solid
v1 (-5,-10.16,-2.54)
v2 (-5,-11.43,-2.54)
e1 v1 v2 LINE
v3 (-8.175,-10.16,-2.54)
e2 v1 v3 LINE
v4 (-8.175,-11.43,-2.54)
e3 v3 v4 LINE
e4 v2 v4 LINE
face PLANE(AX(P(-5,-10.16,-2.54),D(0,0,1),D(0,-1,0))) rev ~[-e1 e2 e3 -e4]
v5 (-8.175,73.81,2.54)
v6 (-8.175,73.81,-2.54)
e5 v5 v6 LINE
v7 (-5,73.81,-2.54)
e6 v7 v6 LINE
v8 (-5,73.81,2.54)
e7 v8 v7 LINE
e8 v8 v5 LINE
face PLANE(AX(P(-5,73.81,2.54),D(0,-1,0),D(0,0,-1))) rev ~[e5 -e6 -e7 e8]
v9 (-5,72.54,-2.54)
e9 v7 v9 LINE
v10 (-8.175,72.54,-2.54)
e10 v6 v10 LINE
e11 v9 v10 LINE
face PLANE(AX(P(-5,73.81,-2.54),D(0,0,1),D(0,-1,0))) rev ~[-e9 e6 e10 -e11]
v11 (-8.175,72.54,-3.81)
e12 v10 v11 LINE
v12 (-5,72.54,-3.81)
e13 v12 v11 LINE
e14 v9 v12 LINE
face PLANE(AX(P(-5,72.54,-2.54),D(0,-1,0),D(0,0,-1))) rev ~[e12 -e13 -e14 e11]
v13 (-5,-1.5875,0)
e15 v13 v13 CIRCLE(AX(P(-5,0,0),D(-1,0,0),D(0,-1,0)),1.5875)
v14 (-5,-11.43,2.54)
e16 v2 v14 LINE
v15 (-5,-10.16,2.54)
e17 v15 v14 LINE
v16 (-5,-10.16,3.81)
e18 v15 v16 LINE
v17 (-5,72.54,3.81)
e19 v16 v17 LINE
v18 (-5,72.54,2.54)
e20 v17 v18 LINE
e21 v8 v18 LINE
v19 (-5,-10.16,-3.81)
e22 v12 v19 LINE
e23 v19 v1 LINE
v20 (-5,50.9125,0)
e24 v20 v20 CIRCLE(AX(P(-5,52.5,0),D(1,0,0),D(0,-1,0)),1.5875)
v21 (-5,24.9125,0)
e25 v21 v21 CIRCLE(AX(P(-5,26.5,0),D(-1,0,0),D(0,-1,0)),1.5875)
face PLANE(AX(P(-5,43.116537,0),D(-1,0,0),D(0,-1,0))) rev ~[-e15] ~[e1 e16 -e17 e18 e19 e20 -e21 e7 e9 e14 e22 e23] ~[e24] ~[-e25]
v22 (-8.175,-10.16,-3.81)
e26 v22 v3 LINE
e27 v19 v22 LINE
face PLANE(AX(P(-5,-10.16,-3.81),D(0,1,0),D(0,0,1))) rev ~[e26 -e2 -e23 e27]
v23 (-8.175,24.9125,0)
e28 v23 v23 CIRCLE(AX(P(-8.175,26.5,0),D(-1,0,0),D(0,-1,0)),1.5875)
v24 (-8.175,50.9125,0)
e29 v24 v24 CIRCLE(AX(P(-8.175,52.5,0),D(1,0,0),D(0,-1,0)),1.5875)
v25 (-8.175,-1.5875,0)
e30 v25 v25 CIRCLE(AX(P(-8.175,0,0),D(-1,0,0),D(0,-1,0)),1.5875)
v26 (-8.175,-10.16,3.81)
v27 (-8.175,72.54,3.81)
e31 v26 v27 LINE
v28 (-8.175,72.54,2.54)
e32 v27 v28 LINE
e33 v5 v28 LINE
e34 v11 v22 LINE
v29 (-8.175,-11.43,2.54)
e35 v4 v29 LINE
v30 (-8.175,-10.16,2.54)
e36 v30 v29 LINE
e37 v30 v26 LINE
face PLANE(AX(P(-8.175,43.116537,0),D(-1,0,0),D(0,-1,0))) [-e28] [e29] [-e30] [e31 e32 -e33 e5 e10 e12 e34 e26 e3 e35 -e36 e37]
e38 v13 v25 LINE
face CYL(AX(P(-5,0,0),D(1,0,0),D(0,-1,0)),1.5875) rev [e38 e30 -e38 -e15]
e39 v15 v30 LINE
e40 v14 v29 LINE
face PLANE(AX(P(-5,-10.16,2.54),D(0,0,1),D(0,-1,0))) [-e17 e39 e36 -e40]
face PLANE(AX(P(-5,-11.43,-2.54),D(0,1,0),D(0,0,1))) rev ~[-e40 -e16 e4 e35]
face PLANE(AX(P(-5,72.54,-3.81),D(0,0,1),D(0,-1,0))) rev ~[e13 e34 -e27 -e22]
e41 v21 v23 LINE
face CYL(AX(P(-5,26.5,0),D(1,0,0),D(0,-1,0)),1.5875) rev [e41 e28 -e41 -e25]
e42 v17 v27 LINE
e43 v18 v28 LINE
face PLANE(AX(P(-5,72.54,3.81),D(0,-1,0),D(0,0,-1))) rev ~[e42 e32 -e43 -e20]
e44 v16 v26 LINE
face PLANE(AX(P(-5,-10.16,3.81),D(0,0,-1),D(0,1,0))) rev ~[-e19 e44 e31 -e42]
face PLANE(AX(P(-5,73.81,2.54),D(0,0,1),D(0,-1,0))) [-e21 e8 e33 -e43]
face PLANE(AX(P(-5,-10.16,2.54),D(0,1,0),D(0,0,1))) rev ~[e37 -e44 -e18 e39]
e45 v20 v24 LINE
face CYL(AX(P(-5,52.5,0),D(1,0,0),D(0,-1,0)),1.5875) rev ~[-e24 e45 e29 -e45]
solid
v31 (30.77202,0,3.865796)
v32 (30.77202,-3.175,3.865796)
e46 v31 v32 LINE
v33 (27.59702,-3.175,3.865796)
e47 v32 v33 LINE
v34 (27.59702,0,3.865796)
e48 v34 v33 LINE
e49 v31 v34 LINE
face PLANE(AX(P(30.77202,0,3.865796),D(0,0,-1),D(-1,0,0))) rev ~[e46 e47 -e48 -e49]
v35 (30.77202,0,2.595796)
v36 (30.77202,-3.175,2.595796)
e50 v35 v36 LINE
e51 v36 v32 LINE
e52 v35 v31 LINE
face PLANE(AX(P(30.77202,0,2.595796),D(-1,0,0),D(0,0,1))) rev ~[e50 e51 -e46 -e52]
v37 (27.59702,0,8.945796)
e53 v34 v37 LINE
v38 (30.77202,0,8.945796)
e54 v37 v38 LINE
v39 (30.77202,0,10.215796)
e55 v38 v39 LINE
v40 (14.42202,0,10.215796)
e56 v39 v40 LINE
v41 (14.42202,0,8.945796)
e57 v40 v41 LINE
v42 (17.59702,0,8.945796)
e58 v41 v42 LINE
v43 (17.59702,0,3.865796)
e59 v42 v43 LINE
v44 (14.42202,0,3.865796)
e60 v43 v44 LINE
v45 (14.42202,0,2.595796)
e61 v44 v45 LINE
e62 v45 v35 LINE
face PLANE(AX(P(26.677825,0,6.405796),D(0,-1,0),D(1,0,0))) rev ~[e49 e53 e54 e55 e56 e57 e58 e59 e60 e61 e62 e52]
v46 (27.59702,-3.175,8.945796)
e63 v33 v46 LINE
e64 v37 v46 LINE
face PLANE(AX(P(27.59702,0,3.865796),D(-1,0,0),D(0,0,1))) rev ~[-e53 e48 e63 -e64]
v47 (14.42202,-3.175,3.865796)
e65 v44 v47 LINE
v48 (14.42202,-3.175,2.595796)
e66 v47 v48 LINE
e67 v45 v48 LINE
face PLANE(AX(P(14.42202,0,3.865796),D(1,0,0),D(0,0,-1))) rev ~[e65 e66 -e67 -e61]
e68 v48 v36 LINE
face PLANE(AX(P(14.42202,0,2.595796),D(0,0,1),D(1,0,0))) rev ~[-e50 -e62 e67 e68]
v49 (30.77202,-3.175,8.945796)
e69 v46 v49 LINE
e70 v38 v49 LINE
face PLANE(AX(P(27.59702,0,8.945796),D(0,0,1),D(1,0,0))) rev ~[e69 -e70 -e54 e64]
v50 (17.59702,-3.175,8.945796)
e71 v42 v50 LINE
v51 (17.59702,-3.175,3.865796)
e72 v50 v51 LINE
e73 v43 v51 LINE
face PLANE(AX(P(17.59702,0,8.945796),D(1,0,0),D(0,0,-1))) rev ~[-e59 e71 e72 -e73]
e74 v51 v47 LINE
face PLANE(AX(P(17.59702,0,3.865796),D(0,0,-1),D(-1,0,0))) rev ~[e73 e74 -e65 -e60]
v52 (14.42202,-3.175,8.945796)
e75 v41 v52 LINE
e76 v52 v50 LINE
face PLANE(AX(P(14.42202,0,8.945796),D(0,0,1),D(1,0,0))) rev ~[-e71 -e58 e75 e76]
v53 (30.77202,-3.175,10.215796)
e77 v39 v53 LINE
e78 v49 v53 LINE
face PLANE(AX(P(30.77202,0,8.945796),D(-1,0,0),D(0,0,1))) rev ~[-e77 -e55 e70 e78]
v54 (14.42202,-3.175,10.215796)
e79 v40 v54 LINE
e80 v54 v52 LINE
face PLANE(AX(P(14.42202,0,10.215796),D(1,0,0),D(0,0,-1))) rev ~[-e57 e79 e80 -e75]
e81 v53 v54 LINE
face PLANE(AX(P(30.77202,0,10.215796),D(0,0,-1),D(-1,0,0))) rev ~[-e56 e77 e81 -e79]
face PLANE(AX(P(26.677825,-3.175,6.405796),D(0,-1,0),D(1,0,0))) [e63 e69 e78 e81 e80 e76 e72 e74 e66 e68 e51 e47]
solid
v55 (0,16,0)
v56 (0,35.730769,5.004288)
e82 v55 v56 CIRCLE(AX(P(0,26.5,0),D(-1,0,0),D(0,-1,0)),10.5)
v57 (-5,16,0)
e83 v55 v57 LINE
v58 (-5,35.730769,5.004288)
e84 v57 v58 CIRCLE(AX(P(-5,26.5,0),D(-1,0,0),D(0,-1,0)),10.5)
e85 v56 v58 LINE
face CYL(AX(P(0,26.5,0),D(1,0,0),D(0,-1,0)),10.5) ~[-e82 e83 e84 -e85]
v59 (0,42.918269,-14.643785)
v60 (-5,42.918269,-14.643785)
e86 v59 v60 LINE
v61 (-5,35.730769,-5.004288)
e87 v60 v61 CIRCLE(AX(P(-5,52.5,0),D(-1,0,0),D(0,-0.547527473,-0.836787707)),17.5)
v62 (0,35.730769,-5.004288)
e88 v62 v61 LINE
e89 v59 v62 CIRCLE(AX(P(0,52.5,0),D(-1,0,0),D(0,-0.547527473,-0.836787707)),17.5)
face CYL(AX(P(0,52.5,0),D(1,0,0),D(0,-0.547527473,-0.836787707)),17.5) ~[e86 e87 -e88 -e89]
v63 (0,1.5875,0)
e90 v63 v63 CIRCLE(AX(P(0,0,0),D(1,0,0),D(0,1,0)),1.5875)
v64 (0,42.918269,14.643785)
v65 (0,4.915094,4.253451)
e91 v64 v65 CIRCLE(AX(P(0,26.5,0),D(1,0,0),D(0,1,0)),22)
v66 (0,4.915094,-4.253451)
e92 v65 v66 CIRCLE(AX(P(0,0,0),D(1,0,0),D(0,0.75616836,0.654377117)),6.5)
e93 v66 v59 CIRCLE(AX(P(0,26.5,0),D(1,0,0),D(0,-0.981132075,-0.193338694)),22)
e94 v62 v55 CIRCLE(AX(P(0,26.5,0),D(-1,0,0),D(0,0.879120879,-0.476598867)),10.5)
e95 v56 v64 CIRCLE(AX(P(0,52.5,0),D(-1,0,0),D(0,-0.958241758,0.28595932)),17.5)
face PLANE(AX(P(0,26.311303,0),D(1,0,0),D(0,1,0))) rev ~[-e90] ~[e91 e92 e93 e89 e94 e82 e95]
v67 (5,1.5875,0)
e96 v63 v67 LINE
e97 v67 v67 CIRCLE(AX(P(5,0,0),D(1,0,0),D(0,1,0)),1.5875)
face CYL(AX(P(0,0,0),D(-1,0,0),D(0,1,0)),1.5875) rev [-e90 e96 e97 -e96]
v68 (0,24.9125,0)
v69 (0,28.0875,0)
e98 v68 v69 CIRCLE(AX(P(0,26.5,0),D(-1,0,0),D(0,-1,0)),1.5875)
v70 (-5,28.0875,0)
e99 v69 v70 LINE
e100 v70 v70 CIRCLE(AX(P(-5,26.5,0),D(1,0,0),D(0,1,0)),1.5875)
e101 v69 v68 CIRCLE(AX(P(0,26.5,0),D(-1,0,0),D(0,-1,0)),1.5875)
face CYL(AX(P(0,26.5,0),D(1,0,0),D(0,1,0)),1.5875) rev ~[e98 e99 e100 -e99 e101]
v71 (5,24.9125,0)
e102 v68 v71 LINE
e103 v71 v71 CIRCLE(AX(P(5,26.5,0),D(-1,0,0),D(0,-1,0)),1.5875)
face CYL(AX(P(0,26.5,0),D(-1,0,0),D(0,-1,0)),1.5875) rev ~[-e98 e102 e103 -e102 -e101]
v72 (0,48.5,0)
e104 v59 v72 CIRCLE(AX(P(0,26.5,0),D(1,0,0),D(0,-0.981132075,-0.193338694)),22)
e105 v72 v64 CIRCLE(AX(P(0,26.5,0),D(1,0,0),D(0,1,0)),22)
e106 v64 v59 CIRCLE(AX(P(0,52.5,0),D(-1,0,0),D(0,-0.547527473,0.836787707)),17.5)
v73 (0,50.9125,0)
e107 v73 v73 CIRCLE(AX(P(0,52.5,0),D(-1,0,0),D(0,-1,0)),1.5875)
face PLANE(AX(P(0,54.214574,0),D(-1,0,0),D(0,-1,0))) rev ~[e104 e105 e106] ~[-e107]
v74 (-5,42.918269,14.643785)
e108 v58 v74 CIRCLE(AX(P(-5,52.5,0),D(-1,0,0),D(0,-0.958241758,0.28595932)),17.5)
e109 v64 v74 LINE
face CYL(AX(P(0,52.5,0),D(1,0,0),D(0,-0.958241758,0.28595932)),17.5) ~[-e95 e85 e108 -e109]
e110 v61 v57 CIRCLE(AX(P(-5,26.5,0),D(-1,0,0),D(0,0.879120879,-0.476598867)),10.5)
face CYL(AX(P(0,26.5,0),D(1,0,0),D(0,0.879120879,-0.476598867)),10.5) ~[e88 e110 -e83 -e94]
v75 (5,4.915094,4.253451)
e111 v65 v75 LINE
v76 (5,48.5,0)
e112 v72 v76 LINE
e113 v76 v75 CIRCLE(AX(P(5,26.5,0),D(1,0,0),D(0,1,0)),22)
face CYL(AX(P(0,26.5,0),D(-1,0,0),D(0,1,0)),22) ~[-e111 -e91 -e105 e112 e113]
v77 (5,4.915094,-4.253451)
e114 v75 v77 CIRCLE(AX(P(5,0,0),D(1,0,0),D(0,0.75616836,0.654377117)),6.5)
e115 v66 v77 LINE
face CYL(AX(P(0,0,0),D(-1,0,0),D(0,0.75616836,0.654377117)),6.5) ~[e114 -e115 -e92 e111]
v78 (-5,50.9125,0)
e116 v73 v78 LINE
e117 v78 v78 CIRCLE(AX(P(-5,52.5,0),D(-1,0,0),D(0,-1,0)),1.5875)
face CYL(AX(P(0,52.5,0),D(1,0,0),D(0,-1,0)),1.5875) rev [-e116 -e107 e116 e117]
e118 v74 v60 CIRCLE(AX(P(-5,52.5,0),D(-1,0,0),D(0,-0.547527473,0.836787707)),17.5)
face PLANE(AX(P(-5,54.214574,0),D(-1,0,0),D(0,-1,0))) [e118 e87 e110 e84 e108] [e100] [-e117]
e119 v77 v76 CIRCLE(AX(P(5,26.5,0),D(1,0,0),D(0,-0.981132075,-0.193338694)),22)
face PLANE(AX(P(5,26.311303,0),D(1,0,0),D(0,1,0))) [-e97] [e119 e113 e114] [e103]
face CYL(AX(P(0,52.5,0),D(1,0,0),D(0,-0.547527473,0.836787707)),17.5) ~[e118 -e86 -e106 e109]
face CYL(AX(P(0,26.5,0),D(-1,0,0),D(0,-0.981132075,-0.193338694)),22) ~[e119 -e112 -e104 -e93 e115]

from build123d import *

# Parameters (mm, degrees)
F0_R     = 4.5
F0_R_2   = 1.5875
F1_DEPTH = 5
F2_R     = 1.5875
F3_DEPTH = 5
F4_R     = 1.5875
F4_W     = 1.27
F4_H     = 2.54
F5_DEPTH = 3.175
F7_DEPTH = 3.175


with BuildPart() as f1:
    # F0 (on Right) → F1 (new body)
    with BuildSketch(Plane.YZ):
        with BuildLine():
            ThreePointArc((4.9150943396, 4.2534512613), (6.0908994905, 2.2695689891), (6.5, 0))
            ThreePointArc((6.5, 0), (6.0908994905, -2.2695689891), (4.9150943396, -4.2534512613))
            ThreePointArc((4.9150943396, -4.2534512613), (28.6368288972, -21.8959805047), (48.5, 0))
            ThreePointArc((48.5, 0), (28.6368288972, 21.8959805047), (4.9150943396, 4.2534512613))
        make_face()
        with BuildLine():
            ThreePointArc((46.5, 0), (26.5, -20), (6.5, 0))
            ThreePointArc((6.5, 0), (26.5, 20), (46.5, 0))
        make_face(mode=Mode.SUBTRACT)
        with BuildLine():
            ThreePointArc((46.5, 0), (26.5, 20), (6.5, 0))
            ThreePointArc((6.5, 0), (26.5, -20), (46.5, 0))
        make_face()
        with BuildLine():
            ThreePointArc((28.0875, 0), (26.5, -1.5875), (24.9125, 0))
            ThreePointArc((24.9125, 0), (26.5, 1.5875), (28.0875, 0))
        make_face(mode=Mode.SUBTRACT)
        with BuildLine():
            ThreePointArc((4.5, 0), (4.6040194953, 2.1368288972), (4.9150943396, 4.2534512613))
            ThreePointArc((4.9150943396, 4.2534512613), (-6.5, 0), (4.9150943396, -4.2534512613))
            ThreePointArc((4.9150943396, -4.2534512613), (4.6040194953, -2.1368288972), (4.5, 0))
        make_face()
        Circle(F0_R, mode=Mode.SUBTRACT)
        Circle(F0_R)
        Circle(F0_R_2, mode=Mode.SUBTRACT)
        with BuildLine():
            Line((4.5, 0), (6.5, 0))
            ThreePointArc((6.5, 0), (6.0908994905, 2.2695689891), (4.9150943396, 4.2534512613))
            ThreePointArc((4.9150943396, 4.2534512613), (4.6040194953, 2.1368288972), (4.5, 0))
        make_face()
        with BuildLine():
            ThreePointArc((4.9150943396, -4.2534512613), (6.0908994905, -2.2695689891), (6.5, 0))
            Line((6.5, 0), (4.5, 0))
            ThreePointArc((4.5, 0), (4.6040194953, -2.1368288972), (4.9150943396, -4.2534512613))
        make_face()
    extrude(amount=F1_DEPTH)

    # F2 (on face) → F3 (join)
    with BuildSketch(Plane(origin=(0, 0, 0), x_dir=(0, -1, 0), z_dir=(-1, 0, 0))):
        with BuildLine():
            ThreePointArc((-44.1875, -13.0825205427), (-47.3940781084, -6.887488657), (-48.5, 0))
            ThreePointArc((-48.5, 0), (-47.3940781084, 6.887488657), (-44.1875, 13.0825205427))
            ThreePointArc((-44.1875, 13.0825205427), (-68, 0), (-44.1875, -13.0825205427))
        make_face()
        with Locations((-52.5, 0)):
            Circle(F2_R, mode=Mode.SUBTRACT)
        with BuildLine():
            ThreePointArc((-35.7307692308, 5.004288102), (-35.1836560085, 2.5286816267), (-35, 0))
            ThreePointArc((-35, 0), (-35.1836560085, -2.5286816267), (-35.7307692308, -5.004288102))
            ThreePointArc((-35.7307692308, -5.004288102), (-23.9186318476, -10.1777472194), (-16, 0))
            ThreePointArc((-16, 0), (-23.9186318476, 10.1777472194), (-35.7307692308, 5.004288102))
        make_face()
        with BuildLine():
            ThreePointArc((-35, 0), (-26.5, 8.5), (-18, 0))
            ThreePointArc((-18, 0), (-26.5, -8.5), (-35, 0))
        make_face(mode=Mode.SUBTRACT)
        with BuildLine():
            ThreePointArc((-35, 0), (-26.5, -8.5), (-18, 0))
            ThreePointArc((-18, 0), (-26.5, 8.5), (-35, 0))
        make_face()
        with BuildLine():
            ThreePointArc((-24.9125, 0), (-26.5, -1.5875), (-28.0875, 0))
            ThreePointArc((-28.0875, 0), (-26.5, 1.5875), (-24.9125, 0))
        make_face(mode=Mode.SUBTRACT)
        with BuildLine():
            ThreePointArc((-44.1875, -13.0825205427), (-68, 0), (-44.1875, 13.0825205427))
            ThreePointArc((-44.1875, 13.0825205427), (-43.5707428158, 13.8776705436), (-42.9182692308, 14.643784875))
            ThreePointArc((-42.9182692308, 14.643784875), (-70, 0), (-42.9182692308, -14.643784875))
            ThreePointArc((-42.9182692308, -14.643784875), (-43.5707428158, -13.8776705436), (-44.1875, -13.0825205427))
        make_face()
        with BuildLine():
            ThreePointArc((-44.1875, -13.0825205427), (-38.9151969098, -7.4634526193), (-37, 0))
            Line((-37, 0), (-48.5, 0))
            ThreePointArc((-48.5, 0), (-47.3940781084, -6.887488657), (-44.1875, -13.0825205427))
        make_face()
        with BuildLine():
            Line((-48.5, 0), (-37, 0))
            ThreePointArc((-37, 0), (-38.9151969098, 7.4634526193), (-44.1875, 13.0825205427))
            ThreePointArc((-44.1875, 13.0825205427), (-47.3940781084, 6.887488657), (-48.5, 0))
        make_face()
        with BuildLine():
            ThreePointArc((-44.1875, 13.0825205427), (-38.9151969098, 7.4634526193), (-37, 0))
            ThreePointArc((-37, 0), (-36.6777472194, 2.5813681524), (-35.7307692308, 5.004288102))
            ThreePointArc((-35.7307692308, 5.004288102), (-38.4706283815, 10.4607233015), (-42.9182692308, 14.643784875))
            ThreePointArc((-42.9182692308, 14.643784875), (-43.5707428158, 13.8776705436), (-44.1875, 13.0825205427))
        make_face()
        with BuildLine():
            ThreePointArc((-35.7307692308, -5.004288102), (-36.6777472194, -2.5813681524), (-37, 0))
            ThreePointArc((-37, 0), (-38.9151969098, -7.4634526193), (-44.1875, -13.0825205427))
            ThreePointArc((-44.1875, -13.0825205427), (-43.5707428158, -13.8776705436), (-42.9182692308, -14.643784875))
            ThreePointArc((-42.9182692308, -14.643784875), (-38.4706283815, -10.4607233015), (-35.7307692308, -5.004288102))
        make_face()
        with BuildLine():
            ThreePointArc((-35.7307692308, -5.004288102), (-35.1836560085, -2.5286816267), (-35, 0))
            Line((-35, 0), (-37, 0))
            ThreePointArc((-37, 0), (-36.6777472194, -2.5813681524), (-35.7307692308, -5.004288102))
        make_face()
        with BuildLine():
            Line((-37, 0), (-35, 0))
            ThreePointArc((-35, 0), (-35.1836560085, 2.5286816267), (-35.7307692308, 5.004288102))
            ThreePointArc((-35.7307692308, 5.004288102), (-36.6777472194, 2.5813681524), (-37, 0))
        make_face()
    extrude(amount=F3_DEPTH)


with BuildPart() as f5:
    # F4 (on face) → F5 (new body)
    with BuildSketch(Plane(origin=(-5, 0, 0), x_dir=(0, -1, 0), z_dir=(-1, 0, 0))):
        with BuildLine():
            ThreePointArc((-69.5802195536, 3.81), (-69.8947383163, 1.9165278255), (-70, 0))
            ThreePointArc((-70, 0), (-69.8947383163, -1.9165278255), (-69.5802195536, -3.81))
            Line((-69.5802195536, -3.81), (-16.7156298108, -3.81))
            ThreePointArc((-16.7156298108, -3.81), (-16, 0), (-16.7156298108, 3.81))
            Line((-16.7156298108, 3.81), (-69.5802195536, 3.81))
        make_face()
        with BuildLine():
            ThreePointArc((-54.0875, 0), (-52.5, 1.5875), (-50.9125, 0))
            ThreePointArc((-50.9125, 0), (-52.5, -1.5875), (-54.0875, 0))
        make_face(mode=Mode.SUBTRACT)
        with Locations((-26.5, 0)):
            Circle(F4_R, mode=Mode.SUBTRACT)
        with BuildLine():
            Line((-72.54, 0), (-70, 0))
            ThreePointArc((-70, 0), (-69.8947383163, 1.9165278255), (-69.5802195536, 3.81))
            Line((-69.5802195536, 3.81), (-72.54, 3.81))
            Line((-72.54, 3.81), (-72.54, 2.54))
            Line((-72.54, 2.54), (-72.54, 0))
        make_face()
        with BuildLine():
            ThreePointArc((-69.5802195536, -3.81), (-69.8947383163, -1.9165278255), (-70, 0))
            Line((-70, 0), (-72.54, 0))
            Line((-72.54, 0), (-72.54, -2.54))
            Line((-72.54, -2.54), (-72.54, -3.81))
            Line((-72.54, -3.81), (-69.5802195536, -3.81))
        make_face()
        with Locations((-73.175, -1.27)):
            Rectangle(F4_W, F4_H)
        with Locations((-73.175, 1.27)):
            Rectangle(F4_W, F4_H)
        with BuildLine():
            Line((10.16, 3.81), (-16.7156298108, 3.81))
            ThreePointArc((-16.7156298108, 3.81), (-16, 0), (-16.7156298108, -3.81))
            Line((-16.7156298108, -3.81), (0, -3.81))
            Line((0, -3.81), (10.16, -3.81))
            Line((10.16, -3.81), (10.16, -2.54))
            Line((10.16, -2.54), (10.16, 0))
            Line((10.16, 0), (10.16, 2.54))
            Line((10.16, 2.54), (10.16, 3.81))
        make_face()
        Circle(F4_R, mode=Mode.SUBTRACT)
        with Locations((10.795, 1.27)):
            Rectangle(F4_W, F4_H)
        with Locations((10.795, -1.27)):
            Rectangle(F4_W, F4_H)
    extrude(amount=F5_DEPTH)


with BuildPart() as f7:
    # F6 (on Front) → F7 (new body)
    with BuildSketch(Plane.XZ):
        Polygon((30.7720199436, 8.9457957841), (30.7720199436, 10.2157957841), (22.5970199436, 10.2157957841), (22.5970199436, 2.5957957841), (30.7720199436, 2.5957957841), (30.7720199436, 3.8657957841), (27.5970199436, 3.8657957841), (27.5970199436, 8.9457957841), align=None)
        Polygon((22.5970199436, 2.5957957841), (22.5970199436, 10.2157957841), (14.4220199436, 10.2157957841), (14.4220199436, 8.9457957841), (17.5970199436, 8.9457957841), (17.5970199436, 3.8657957841), (14.4220199436, 3.8657957841), (14.4220199436, 2.5957957841), align=None)
    extrude(amount=F7_DEPTH)


solid = Compound([f1.part, f5.part, f7.part])
